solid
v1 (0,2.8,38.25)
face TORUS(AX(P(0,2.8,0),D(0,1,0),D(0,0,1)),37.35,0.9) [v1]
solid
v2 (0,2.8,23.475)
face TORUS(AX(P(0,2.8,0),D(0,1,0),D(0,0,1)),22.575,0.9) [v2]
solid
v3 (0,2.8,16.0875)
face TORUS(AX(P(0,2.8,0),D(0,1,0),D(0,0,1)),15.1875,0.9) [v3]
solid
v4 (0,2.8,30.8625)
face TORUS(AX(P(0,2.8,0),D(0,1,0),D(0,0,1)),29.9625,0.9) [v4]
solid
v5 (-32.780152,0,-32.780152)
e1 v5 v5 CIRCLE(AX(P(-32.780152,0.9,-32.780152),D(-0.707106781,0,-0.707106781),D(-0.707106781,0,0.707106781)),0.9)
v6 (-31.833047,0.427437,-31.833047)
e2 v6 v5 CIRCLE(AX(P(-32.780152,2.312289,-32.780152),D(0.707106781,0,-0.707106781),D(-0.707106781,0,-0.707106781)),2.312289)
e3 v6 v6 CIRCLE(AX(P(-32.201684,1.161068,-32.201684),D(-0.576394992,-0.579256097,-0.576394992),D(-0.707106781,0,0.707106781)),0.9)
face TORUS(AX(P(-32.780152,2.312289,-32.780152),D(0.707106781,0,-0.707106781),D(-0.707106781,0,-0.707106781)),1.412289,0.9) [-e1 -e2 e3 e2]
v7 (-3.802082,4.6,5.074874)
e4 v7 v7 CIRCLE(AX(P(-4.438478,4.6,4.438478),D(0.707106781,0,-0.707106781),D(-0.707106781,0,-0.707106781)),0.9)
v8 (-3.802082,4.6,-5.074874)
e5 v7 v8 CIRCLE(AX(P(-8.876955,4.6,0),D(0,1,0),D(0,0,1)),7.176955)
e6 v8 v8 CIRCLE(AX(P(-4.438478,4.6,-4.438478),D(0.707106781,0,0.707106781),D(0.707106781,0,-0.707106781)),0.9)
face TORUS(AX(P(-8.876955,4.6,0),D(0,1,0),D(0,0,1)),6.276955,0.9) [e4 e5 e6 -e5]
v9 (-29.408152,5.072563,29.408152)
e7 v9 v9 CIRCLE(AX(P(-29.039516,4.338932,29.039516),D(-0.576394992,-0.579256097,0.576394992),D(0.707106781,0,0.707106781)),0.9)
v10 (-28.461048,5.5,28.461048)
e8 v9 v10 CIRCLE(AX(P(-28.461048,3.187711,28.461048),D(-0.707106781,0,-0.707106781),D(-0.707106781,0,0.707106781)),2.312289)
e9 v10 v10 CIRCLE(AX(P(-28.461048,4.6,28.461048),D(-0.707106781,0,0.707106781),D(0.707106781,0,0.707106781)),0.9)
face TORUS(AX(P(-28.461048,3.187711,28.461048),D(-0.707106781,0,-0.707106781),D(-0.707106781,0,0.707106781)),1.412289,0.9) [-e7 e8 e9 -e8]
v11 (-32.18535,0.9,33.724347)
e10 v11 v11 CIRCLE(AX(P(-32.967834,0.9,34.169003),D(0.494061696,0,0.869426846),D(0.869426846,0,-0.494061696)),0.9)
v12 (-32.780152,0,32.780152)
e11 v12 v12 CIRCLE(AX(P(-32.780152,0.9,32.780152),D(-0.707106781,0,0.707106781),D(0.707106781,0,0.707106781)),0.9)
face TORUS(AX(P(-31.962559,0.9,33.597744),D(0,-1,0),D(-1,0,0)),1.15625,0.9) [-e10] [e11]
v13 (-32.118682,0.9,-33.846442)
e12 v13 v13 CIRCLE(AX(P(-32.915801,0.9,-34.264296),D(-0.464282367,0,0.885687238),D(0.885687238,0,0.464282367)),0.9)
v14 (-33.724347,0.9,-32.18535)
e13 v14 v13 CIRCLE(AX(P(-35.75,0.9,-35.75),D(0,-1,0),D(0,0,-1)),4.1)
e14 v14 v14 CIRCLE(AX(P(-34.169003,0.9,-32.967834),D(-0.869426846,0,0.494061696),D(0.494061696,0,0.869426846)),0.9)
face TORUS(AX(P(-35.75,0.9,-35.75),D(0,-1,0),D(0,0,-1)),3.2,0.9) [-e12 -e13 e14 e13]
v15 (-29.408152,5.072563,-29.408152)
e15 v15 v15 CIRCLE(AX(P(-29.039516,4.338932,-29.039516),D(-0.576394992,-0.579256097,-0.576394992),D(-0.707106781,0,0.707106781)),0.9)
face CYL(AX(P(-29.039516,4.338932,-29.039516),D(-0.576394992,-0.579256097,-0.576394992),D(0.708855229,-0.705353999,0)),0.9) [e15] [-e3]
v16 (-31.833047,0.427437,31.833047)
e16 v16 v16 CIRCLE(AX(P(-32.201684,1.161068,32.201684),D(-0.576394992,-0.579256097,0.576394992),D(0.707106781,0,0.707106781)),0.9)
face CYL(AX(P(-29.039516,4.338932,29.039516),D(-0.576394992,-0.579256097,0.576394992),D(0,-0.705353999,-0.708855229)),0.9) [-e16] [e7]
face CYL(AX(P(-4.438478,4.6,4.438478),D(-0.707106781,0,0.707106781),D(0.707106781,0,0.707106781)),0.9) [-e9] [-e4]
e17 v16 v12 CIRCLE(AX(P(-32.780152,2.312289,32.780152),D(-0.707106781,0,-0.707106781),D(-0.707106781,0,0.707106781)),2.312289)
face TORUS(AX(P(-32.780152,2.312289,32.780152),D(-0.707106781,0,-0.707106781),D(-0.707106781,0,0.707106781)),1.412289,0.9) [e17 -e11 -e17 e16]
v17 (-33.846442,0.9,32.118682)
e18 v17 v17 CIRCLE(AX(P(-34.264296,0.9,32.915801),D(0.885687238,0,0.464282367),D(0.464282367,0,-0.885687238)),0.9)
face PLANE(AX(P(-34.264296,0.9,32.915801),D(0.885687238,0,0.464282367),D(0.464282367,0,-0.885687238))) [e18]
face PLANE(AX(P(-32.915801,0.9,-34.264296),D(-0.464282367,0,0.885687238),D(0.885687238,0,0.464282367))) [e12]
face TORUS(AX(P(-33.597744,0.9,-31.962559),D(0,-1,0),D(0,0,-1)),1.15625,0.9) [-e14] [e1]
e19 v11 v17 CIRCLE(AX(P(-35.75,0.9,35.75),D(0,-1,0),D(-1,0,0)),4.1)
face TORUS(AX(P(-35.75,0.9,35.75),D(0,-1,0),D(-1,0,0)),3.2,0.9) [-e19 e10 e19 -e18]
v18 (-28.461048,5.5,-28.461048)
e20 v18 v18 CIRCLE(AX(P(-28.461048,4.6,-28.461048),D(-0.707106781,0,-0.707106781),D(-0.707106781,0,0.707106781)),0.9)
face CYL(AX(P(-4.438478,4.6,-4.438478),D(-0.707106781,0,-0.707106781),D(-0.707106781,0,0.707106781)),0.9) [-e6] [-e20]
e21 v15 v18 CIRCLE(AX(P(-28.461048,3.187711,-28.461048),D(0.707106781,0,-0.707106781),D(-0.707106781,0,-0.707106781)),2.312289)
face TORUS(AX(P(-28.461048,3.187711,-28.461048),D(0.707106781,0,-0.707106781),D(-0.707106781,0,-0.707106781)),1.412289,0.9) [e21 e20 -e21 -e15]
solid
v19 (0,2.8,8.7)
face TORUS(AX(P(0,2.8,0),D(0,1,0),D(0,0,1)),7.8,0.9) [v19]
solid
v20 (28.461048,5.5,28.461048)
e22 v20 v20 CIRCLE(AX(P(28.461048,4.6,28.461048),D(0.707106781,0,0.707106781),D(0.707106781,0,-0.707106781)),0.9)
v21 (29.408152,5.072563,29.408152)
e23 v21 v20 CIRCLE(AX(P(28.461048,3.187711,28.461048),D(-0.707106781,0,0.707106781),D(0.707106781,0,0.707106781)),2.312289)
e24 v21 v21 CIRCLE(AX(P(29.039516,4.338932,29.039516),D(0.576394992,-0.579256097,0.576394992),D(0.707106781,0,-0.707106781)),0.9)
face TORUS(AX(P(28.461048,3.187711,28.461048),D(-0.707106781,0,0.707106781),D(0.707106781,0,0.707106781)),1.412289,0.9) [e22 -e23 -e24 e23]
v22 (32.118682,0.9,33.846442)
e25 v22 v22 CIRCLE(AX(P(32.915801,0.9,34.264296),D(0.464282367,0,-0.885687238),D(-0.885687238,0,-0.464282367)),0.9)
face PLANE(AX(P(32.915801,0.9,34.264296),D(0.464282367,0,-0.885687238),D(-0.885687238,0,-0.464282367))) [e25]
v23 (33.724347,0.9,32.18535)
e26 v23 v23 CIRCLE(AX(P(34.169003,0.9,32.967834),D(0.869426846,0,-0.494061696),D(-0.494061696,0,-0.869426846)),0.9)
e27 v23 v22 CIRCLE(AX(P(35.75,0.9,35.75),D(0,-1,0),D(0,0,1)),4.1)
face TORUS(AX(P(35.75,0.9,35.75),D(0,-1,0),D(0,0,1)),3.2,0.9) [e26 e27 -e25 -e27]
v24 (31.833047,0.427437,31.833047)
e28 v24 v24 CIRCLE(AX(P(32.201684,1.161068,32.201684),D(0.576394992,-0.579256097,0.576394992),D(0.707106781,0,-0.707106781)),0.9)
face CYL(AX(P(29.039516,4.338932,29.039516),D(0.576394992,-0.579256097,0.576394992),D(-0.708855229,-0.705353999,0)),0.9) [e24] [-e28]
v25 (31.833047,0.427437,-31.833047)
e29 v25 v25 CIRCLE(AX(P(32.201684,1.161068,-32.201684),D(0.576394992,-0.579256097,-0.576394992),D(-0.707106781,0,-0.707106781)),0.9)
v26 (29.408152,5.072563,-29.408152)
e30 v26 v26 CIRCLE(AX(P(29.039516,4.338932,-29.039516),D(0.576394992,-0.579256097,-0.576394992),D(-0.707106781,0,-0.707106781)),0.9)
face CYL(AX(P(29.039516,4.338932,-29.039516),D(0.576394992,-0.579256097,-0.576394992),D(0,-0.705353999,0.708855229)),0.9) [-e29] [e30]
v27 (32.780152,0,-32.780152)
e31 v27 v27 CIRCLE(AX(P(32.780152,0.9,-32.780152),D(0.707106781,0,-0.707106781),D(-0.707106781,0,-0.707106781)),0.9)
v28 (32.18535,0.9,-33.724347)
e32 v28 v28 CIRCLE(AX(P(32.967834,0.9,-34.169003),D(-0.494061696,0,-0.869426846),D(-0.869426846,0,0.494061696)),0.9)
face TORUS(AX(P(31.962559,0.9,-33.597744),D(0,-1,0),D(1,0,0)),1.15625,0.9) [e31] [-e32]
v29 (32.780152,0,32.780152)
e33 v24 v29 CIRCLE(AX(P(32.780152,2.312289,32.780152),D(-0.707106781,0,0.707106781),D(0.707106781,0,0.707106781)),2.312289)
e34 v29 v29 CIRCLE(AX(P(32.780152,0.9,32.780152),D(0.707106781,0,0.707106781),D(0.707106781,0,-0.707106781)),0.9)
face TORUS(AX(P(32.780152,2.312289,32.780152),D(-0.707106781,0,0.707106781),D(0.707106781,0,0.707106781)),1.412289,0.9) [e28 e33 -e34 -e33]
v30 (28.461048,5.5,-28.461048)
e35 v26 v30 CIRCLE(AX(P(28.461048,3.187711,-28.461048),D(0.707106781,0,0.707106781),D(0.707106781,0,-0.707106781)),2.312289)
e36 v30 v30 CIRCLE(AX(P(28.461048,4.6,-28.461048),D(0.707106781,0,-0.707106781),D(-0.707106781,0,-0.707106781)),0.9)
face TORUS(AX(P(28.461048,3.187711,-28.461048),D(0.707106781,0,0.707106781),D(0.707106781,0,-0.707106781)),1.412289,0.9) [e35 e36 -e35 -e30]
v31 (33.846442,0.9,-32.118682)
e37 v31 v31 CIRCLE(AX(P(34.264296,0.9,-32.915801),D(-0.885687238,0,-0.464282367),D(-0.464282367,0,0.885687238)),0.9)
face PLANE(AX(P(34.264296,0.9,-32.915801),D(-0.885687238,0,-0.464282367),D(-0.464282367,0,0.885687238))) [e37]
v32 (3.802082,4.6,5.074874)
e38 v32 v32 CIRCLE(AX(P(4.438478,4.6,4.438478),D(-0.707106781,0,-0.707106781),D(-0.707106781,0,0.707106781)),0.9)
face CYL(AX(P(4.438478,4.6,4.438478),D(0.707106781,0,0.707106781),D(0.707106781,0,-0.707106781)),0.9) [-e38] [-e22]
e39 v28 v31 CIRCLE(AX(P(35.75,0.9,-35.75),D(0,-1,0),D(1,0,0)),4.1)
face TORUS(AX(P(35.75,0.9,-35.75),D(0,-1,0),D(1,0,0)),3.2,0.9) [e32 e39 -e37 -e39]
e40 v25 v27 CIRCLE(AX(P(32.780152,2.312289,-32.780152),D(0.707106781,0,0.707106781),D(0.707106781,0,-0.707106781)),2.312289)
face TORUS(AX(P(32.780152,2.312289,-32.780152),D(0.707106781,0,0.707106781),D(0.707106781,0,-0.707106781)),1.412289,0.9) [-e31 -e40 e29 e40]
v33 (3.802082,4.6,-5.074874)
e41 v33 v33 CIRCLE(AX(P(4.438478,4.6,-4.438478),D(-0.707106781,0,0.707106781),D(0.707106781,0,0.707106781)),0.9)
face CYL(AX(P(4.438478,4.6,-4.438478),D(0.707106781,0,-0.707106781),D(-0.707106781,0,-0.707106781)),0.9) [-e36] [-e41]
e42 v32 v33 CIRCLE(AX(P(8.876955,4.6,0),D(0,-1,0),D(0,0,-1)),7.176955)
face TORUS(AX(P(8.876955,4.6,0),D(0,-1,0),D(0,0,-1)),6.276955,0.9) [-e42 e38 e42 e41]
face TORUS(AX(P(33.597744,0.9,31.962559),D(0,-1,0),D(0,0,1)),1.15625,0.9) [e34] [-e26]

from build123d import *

# Parameters (mm, degrees)
SKETCH1_R               = 0.9
SKETCH3_R               = 0.9
SKETCH5_R               = 0.9
SKETCH7_R               = 0.9
CUT_EXTRUDE1_DEPTH      = 57.624155773
CUT_EXTRUDE1_DEPTH_BACK = 57.624155773
CIRPATTERN1_COUNT       = 4
SKETCH10_R              = 0.9
SKETCH12_R              = 0.9


with BuildPart() as part:
    # Sketch1 → Revolve1 (revolve)
    with BuildSketch(Plane.XY, mode=Mode.PRIVATE) as revolve1_sk:
        with Locations((-7.8, 2.8)):
            Circle(SKETCH1_R)
        with Locations((-37.35, 2.8)):
            Circle(SKETCH1_R)
        with Locations((-29.9625, 2.8)):
            Circle(SKETCH1_R)
        with Locations((-22.575, 2.8)):
            Circle(SKETCH1_R)
        with Locations((-15.1875, 2.8)):
            Circle(SKETCH1_R)
    revolve(revolve1_sk.sketch.rotate(Axis((0, 2.8, 0), (0, -1, 0)), 270), axis=Axis((0, 2.8, 0), (0, -1, 0)))


with BuildPart() as body_2:
    # Sweep1: sweep along a path in Sketch2
    with BuildLine(Plane(origin=(0, 0, 0), x_dir=(1, 0, 0), z_dir=(0, 1, 0))) as sweep1_path:
        Line((-28.461047943, 28.461047943), (-4.438477631, 4.438477631))
        ThreePointArc((-4.438477631, 4.438477631), (-3.077804769, 2.402086785), (-2.6, 0))
    # Sketch3 → Sweep1 (sweep)
    with BuildSketch(Plane.XY):
        with Locations((-2.6, 4.6)):
            Circle(SKETCH3_R)
    sweep(path=sweep1_path.line)

    # Sweep2: sweep along a path in Sketch4
    with BuildLine(Plane(origin=(0, 0, 0), x_dir=(-0.7071067811865488, 0, -0.7071067811865464), z_dir=(0.7071067811865464, 0, -0.7071067811865488))) as sweep2_path:
        ThreePointArc((40.25, 4.6), (40.679361812, 4.533150941), (41.068076935, 4.338932211))
        Line((41.068076935, 4.338932211), (45.54005792, 1.161067789))
        ThreePointArc((45.54005792, 1.161067789), (45.928773043, 0.966849059), (46.358134855, 0.9))
    # Sketch5 → Sweep2 (sweep)
    with BuildSketch(Plane(origin=(-28.461047943, 0, -28.461047943), x_dir=(-0.7071067811865516, 0, 0.7071067811865435), z_dir=(-0.7071067811865435, 0, -0.7071067811865516))):
        with Locations((0, 4.6)):
            Circle(SKETCH5_R)
    sweep(path=sweep2_path.line)

    # Sweep3: sweep along a path in Sketch6
    with BuildLine(Plane(origin=(0, 0, 0), x_dir=(1, 0, 0), z_dir=(0, 1, 0))) as sweep3_path:
        ThreePointArc((-32.780151519, 32.780151519), (-33.442901168, 33.108394301), (-34.169002571, 32.967834094))
        ThreePointArc((-34.169002571, 32.967834094), (-38.050802877, 37.974029254), (-32.915800838, 34.264296426))
    # Sketch7 → Sweep3 (sweep)
    with BuildSketch(Plane(origin=(-32.780151519, 0, -32.780151519), x_dir=(-0.7071067811865515, 2.0261570199408882e-15, 0.7071067811865437), z_dir=(-0.7071067811865437, -2.0261570199409115e-15, -0.7071067811865515))):
        with Locations((0, 0.9)):
            Circle(SKETCH7_R)
    sweep(path=sweep3_path.line)

    # Sketch8 → Cut-Extrude1 (cut, two sides: drawn at the far end of the back side and taken through both)
    with BuildSketch(Plane(origin=(0, 0, 0), x_dir=(1, 0, 0), z_dir=(0, 1, 0)).offset(-CUT_EXTRUDE1_DEPTH_BACK)):
        Polygon((-97.53238372, -88.655428458), (-5.074873734, 3.802081528), (-3.802081528, 5.074873734), (88.655428458, 97.53238372), (273.57044843, -87.382636252), (87.382636252, -273.57044843), align=None)
    extrude(amount=CUT_EXTRUDE1_DEPTH + CUT_EXTRUDE1_DEPTH_BACK, mode=Mode.SUBTRACT)


with BuildPart() as cirpattern1_1:
    # CirPattern1: pattern copy
    add(body_2.part.rotate(Axis((0, 0, 0), (0, 1, 0)), 1 * 360 / CIRPATTERN1_COUNT))


with BuildPart() as cirpattern1_2:
    # CirPattern1: pattern copy
    add(body_2.part.rotate(Axis((0, 0, 0), (0, 1, 0)), 2 * 360 / CIRPATTERN1_COUNT))



with BuildPart() as cirpattern1_3:
    # CirPattern1: pattern copy
    add(body_2.part.rotate(Axis((0, 0, 0), (0, 1, 0)), 3 * 360 / CIRPATTERN1_COUNT))


with BuildPart() as body_2_1:
    add(body_2.part)

    add(cirpattern1_1.part)  # Sweep4 merges CirPattern1_1
    # Sweep4: sweep along a path in Sketch9
    with BuildLine(Plane(origin=(0, 0, 0), x_dir=(1, 0, 0), z_dir=(0, 1, 0))) as sweep4_path:
        ThreePointArc((-4.438477631, 4.438477631), (-2.6, 0), (-4.438477631, -4.438477631))
    # Sketch10 → Sweep4 (sweep)
    with BuildSketch(Plane(origin=(-4.438477631, 0, -4.438477631), x_dir=(0.7071067811865474, 0, -0.7071067811865477), z_dir=(0.7071067811865477, 0, 0.7071067811865474))):
        with Locations((0, 4.6)):
            Circle(SKETCH10_R)
    sweep(path=sweep4_path.line)


with BuildPart() as cirpattern1_2_1:
    add(cirpattern1_2.part)

    add(cirpattern1_3.part)  # Sweep5 merges CirPattern1_3
    # Sweep5: sweep along a path in Sketch11
    with BuildLine(Plane(origin=(0, 0, 0), x_dir=(1, 0, 0), z_dir=(0, 1, 0))) as sweep5_path:
        ThreePointArc((4.438477631, 4.438477631), (2.6, 0), (4.438477631, -4.438477631))
    # Sketch12 → Sweep5 (sweep)
    with BuildSketch(Plane(origin=(4.438477631, 0, -4.438477631), x_dir=(0.7071067811865551, 2.0443912222444393e-15, 0.7071067811865399), z_dir=(-0.7071067811865399, 2.044391222244483e-15, 0.7071067811865551))):
        with Locations((0, 4.6)):
            Circle(SKETCH12_R)
    sweep(path=sweep5_path.line)


solid = Compound([part.part, body_2_1.part, cirpattern1_2_1.part])
